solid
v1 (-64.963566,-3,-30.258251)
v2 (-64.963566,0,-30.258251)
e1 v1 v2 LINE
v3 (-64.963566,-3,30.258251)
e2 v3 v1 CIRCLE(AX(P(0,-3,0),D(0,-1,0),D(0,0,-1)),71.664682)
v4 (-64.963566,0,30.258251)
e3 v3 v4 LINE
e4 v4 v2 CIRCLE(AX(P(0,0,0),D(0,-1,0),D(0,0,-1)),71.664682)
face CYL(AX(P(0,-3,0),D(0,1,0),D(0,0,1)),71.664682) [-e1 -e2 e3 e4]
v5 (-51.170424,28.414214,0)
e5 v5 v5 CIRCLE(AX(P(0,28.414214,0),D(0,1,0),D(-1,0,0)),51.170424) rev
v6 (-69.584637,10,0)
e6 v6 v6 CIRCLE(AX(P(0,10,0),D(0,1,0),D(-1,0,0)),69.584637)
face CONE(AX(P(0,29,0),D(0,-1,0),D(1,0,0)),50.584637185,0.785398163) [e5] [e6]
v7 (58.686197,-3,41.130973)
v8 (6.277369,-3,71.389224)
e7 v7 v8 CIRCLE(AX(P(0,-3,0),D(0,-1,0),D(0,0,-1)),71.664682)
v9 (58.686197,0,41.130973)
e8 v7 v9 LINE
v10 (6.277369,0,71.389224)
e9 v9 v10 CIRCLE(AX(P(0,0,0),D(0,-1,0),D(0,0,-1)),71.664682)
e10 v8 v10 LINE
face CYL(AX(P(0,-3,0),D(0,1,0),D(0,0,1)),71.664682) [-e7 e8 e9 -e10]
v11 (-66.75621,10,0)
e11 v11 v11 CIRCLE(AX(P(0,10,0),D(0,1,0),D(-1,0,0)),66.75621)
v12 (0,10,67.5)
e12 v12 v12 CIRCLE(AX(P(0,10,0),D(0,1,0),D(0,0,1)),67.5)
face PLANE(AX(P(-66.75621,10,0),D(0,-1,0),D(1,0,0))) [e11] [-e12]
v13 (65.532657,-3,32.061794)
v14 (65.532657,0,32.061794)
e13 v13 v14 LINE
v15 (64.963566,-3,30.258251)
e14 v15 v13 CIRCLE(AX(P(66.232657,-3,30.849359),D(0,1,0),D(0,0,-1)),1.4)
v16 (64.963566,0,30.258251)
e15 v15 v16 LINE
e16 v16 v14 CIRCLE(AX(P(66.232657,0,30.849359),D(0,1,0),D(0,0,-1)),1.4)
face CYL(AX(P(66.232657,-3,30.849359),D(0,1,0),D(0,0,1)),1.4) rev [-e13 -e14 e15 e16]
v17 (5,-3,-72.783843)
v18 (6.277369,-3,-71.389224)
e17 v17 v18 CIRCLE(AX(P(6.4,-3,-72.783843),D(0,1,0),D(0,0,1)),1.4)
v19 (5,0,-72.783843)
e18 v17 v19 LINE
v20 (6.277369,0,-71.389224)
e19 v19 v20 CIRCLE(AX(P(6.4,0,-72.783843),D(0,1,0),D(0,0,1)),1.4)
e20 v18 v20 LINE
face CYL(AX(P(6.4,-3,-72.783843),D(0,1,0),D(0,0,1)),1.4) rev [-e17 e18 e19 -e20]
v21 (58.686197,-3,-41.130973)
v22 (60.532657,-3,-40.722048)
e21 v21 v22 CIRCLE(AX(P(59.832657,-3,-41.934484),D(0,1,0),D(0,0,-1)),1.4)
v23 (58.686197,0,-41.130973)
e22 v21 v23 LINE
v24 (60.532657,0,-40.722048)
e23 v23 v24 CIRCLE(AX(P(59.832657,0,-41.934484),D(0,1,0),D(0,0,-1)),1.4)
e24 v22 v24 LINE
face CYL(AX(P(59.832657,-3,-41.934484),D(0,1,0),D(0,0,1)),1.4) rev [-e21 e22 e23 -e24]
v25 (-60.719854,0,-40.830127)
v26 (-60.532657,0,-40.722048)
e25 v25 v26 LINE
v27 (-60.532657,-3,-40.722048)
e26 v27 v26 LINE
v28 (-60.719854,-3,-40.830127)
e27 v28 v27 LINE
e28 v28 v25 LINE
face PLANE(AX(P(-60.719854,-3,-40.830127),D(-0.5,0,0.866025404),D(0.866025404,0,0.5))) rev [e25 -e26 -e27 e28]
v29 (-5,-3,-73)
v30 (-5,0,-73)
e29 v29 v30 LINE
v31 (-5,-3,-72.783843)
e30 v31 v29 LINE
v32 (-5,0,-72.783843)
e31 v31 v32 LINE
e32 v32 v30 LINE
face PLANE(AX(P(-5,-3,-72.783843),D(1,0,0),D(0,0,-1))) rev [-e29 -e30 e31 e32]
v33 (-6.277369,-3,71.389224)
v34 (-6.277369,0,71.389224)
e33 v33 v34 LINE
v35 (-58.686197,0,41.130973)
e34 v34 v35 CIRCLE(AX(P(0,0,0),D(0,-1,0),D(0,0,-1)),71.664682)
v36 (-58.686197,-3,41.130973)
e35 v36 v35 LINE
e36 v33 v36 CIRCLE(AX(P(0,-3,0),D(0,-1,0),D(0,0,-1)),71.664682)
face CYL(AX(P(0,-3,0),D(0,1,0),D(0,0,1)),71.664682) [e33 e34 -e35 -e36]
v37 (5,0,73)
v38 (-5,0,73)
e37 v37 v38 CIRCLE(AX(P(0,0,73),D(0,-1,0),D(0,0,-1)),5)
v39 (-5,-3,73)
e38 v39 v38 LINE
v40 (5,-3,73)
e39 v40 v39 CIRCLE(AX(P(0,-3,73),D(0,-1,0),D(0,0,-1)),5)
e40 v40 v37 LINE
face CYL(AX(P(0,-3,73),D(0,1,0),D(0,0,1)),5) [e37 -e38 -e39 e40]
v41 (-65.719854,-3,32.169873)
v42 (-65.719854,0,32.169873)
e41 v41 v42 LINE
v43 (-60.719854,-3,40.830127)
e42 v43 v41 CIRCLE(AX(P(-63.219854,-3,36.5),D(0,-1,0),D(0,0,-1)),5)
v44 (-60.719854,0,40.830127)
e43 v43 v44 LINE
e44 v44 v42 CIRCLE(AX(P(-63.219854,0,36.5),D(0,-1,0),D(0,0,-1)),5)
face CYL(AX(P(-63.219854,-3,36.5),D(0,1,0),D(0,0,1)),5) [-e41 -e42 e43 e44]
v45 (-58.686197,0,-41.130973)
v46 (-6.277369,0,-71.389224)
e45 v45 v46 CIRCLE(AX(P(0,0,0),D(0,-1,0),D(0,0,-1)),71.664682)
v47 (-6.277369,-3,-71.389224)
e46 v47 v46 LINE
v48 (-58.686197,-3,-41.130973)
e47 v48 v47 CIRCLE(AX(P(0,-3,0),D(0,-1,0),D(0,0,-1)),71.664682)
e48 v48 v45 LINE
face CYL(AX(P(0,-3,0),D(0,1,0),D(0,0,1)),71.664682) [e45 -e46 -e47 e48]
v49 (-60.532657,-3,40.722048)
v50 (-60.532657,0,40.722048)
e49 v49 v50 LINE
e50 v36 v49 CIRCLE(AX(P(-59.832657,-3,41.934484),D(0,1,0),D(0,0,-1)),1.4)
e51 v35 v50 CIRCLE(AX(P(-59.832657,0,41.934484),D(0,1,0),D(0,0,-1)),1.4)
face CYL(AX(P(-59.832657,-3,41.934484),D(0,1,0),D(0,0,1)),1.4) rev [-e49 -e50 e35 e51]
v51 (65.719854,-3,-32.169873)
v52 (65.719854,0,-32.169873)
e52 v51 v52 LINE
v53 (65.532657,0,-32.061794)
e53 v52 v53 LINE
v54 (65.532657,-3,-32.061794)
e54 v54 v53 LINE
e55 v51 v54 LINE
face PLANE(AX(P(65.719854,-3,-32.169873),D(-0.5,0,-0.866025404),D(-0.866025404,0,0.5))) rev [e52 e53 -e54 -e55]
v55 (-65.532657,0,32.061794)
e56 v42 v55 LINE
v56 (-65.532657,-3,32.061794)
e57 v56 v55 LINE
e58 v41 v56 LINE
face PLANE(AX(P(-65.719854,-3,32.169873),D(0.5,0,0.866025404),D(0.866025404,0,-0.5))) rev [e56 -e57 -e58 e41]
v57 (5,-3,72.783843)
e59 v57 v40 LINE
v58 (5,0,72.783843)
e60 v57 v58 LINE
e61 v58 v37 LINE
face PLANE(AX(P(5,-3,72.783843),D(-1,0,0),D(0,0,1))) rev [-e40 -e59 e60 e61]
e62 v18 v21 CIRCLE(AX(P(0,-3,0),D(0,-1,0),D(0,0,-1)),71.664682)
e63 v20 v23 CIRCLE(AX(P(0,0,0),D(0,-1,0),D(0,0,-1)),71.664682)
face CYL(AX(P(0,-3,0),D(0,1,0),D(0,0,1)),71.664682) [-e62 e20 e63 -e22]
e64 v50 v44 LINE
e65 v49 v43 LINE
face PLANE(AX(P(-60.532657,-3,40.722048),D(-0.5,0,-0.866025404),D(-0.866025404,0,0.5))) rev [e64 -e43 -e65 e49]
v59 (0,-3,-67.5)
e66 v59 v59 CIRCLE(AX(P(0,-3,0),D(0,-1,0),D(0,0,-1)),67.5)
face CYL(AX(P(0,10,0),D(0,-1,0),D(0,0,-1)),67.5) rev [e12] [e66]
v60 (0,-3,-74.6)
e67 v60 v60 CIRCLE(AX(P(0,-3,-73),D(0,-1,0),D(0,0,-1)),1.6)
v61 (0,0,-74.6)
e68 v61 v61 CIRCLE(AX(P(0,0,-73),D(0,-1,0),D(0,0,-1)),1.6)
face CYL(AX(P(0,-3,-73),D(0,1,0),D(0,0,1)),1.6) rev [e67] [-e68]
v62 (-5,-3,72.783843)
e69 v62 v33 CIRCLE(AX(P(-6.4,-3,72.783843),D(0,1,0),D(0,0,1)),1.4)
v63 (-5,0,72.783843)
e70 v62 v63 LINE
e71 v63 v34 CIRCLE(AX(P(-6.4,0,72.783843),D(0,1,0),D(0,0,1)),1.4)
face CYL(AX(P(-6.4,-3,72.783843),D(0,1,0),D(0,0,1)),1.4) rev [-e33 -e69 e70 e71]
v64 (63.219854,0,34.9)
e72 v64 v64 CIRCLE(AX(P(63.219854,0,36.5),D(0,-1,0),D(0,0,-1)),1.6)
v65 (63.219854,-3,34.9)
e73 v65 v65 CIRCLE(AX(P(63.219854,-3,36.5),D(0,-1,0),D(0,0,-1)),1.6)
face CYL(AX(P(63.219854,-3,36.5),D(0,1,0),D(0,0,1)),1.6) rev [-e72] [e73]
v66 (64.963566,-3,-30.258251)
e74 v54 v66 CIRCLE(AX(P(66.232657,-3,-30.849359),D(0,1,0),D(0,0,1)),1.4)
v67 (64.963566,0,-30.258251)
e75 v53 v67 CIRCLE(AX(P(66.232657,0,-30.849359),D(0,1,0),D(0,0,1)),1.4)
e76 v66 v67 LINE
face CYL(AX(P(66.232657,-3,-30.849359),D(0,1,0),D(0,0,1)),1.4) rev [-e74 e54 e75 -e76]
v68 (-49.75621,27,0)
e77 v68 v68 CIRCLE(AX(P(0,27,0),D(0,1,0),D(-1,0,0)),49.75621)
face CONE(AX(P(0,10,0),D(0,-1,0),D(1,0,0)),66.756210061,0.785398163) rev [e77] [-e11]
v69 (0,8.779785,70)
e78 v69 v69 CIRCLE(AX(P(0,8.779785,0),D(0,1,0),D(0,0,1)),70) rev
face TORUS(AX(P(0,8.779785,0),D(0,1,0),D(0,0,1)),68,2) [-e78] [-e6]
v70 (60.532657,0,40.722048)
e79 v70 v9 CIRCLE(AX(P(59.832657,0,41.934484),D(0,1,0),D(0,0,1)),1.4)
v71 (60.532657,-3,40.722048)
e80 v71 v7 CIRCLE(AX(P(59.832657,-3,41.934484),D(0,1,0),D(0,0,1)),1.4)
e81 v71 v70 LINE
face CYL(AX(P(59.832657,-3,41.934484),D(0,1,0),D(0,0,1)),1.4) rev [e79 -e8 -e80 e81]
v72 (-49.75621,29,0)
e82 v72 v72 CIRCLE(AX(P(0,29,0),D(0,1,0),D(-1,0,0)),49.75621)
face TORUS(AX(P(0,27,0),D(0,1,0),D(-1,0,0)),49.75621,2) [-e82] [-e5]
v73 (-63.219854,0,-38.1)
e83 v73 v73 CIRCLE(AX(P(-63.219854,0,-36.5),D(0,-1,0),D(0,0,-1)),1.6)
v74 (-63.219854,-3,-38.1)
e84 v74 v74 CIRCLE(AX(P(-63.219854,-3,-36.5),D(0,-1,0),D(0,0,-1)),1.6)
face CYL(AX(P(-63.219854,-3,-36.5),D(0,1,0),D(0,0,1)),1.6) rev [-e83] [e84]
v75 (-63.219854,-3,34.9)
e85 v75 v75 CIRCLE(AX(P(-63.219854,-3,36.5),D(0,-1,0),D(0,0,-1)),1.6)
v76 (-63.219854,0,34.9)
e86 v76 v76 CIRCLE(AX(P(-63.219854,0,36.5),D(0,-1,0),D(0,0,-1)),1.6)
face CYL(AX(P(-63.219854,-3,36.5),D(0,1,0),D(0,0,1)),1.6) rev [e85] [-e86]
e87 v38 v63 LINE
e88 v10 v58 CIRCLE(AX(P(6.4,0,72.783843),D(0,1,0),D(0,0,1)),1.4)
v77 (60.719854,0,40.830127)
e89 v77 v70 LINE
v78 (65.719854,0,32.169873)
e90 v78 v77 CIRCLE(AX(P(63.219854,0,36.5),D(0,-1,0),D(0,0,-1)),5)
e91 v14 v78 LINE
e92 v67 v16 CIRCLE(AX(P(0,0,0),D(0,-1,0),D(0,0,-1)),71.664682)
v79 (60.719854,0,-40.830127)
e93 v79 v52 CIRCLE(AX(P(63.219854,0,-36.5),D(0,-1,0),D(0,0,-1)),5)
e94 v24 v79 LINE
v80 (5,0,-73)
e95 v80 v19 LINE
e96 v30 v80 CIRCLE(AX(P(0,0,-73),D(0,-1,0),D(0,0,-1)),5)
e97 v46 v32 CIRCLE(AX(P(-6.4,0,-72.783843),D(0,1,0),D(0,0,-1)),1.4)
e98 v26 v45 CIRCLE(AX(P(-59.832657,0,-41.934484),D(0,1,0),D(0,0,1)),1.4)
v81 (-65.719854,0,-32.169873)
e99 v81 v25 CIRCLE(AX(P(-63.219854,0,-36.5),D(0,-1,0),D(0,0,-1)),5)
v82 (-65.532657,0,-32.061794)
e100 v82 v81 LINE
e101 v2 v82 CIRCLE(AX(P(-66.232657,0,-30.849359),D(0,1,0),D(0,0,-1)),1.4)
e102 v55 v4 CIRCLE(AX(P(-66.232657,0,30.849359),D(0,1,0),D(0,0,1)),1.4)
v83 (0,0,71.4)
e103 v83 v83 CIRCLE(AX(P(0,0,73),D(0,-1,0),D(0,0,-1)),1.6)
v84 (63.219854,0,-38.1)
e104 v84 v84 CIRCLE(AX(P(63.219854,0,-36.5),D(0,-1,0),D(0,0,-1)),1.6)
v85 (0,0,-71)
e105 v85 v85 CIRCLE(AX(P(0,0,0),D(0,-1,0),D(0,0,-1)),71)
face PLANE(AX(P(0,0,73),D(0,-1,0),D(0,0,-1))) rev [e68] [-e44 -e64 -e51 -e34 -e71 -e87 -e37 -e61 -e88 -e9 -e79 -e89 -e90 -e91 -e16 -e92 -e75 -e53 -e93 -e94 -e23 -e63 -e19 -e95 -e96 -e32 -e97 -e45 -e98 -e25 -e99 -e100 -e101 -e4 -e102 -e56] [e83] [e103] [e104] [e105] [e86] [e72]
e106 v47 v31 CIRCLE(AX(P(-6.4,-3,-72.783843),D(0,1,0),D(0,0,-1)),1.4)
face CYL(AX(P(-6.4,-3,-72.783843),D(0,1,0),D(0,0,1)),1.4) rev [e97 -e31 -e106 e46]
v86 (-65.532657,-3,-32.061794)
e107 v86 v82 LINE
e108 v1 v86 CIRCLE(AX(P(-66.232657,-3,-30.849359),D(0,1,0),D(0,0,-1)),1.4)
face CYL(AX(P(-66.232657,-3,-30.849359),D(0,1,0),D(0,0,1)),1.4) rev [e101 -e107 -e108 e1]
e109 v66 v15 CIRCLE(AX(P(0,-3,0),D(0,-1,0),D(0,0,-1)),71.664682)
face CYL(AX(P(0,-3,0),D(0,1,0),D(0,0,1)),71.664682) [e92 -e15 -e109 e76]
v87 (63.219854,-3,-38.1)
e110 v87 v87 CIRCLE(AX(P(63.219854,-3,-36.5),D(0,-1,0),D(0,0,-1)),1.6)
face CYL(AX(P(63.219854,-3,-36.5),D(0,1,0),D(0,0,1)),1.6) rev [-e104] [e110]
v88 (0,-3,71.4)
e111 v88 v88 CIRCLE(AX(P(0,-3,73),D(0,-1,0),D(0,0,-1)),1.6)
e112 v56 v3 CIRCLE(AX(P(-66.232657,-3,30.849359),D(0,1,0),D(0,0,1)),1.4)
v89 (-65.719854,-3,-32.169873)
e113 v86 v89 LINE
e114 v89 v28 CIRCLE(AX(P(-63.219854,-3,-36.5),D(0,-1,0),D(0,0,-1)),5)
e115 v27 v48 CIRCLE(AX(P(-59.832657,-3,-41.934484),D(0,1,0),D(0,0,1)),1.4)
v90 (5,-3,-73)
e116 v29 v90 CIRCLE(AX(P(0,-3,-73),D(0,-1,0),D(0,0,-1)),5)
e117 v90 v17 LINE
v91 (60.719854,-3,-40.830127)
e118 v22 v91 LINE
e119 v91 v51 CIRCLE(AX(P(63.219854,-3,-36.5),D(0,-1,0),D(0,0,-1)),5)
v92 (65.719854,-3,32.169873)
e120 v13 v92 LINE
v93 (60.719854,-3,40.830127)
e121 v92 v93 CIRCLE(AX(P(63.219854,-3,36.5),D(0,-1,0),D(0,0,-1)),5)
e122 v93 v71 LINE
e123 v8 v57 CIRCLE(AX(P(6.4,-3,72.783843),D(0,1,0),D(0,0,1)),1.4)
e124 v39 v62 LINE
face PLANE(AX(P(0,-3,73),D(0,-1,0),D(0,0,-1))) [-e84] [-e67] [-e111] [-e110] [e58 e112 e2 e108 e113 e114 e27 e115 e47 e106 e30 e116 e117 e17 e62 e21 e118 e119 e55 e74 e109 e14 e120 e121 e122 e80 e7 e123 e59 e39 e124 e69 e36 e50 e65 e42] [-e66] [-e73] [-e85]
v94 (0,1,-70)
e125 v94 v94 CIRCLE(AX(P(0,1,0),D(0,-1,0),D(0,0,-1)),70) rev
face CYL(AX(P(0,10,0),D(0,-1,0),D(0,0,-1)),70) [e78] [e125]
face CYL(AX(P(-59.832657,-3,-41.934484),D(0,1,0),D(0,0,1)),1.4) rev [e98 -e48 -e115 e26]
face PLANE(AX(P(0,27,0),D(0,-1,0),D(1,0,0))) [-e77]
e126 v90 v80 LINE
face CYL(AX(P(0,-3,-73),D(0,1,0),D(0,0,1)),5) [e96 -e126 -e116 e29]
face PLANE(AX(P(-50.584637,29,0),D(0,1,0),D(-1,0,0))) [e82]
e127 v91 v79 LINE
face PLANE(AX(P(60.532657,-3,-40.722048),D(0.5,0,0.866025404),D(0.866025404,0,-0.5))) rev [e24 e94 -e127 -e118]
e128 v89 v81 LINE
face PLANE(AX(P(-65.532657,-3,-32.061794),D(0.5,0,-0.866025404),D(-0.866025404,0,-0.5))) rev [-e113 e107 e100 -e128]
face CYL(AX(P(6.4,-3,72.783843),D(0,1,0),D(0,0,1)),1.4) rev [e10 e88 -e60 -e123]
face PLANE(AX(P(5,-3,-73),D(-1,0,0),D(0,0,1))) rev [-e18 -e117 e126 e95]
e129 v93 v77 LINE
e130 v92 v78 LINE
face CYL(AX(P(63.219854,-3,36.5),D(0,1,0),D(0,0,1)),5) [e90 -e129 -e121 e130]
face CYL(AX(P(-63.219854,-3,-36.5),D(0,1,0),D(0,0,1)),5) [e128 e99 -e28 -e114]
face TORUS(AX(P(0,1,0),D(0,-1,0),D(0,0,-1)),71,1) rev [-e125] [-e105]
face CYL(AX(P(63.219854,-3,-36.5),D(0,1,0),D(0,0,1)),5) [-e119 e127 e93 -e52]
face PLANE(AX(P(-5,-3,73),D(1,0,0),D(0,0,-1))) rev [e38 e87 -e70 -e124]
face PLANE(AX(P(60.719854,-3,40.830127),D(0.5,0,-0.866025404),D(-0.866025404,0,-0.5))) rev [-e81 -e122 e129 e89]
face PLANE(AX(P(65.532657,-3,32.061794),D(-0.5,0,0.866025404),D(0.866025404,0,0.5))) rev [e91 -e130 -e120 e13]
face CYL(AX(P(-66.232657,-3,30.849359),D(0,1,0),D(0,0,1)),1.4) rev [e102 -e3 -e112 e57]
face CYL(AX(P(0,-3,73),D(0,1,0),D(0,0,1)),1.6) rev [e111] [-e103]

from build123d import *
from build123d.topology import SkipClean

# Parameters (mm, degrees)
SKETCH_1_R      = 70
SKETCH_1_R_2    = 67.5
EXTRUDE_1_DEPTH = 10
EXTRUDE_START   = 3
SKETCH_2_R      = 67.5
SKETCH_2_R_2    = 1.6
EXTRUDE_2_DEPTH = 3
FILLET_1_R      = 1
FILLET_2_R      = 2


with BuildPart() as part:
    # Эскиз1 → Бобышка-Вытянуть1 (new body)
    with BuildSketch(Plane(origin=(0, 0, 0), x_dir=(1, 0, 0), z_dir=(0, 1, 0))):
        with Locations(Location((0, 0, 0), (0, 0, 270))):
            Circle(SKETCH_1_R)
        with Locations(Location((0, 0, 0), (0, 0, 270))):
            Circle(SKETCH_1_R_2, mode=Mode.SUBTRACT)
    extrude(amount=EXTRUDE_1_DEPTH)

    # Эскиз2 → Бобышка-Вытянуть2 (add)
    with SkipClean():  # the faces are left unmerged after this step: merging them gives an invalid solid
        with BuildSketch(Plane.XZ.offset(EXTRUDE_START)):
            with BuildLine():
                Line((-5, 73), (-5, 72.783842909))
                ThreePointArc((-5, 72.783842909), (-5.367603881, 71.838243495), (-6.277368932, 71.389224101))
                ThreePointArc((-6.277368932, 71.389224101), (-35.832341113, 62.063435361), (-58.686197162, 41.130973015))
                ThreePointArc((-58.686197162, 41.130973015), (-59.52994189, 40.567603065), (-60.532656944, 40.722048474))
                Line((-60.532656944, 40.722048474), (-60.719854476, 40.830127019))
                ThreePointArc((-60.719854476, 40.830127019), (-67.549981495, 39), (-65.719854476, 32.169872981))
                Line((-65.719854476, 32.169872981), (-65.532656944, 32.061794436))
                ThreePointArc((-65.532656944, 32.061794436), (-64.89754577, 31.270640429), (-64.963566094, 30.258251086))
                ThreePointArc((-64.963566094, 30.258251086), (-71.664682225, 0), (-64.963566094, -30.258251086))
                ThreePointArc((-64.963566094, -30.258251086), (-64.89754577, -31.270640429), (-65.532656944, -32.061794436))
                Line((-65.532656944, -32.061794436), (-65.719854476, -32.169872981))
                ThreePointArc((-65.719854476, -32.169872981), (-67.549981495, -39), (-60.719854476, -40.830127019))
                Line((-60.719854476, -40.830127019), (-60.532656944, -40.722048474))
                ThreePointArc((-60.532656944, -40.722048474), (-59.52994189, -40.567603065), (-58.686197162, -41.130973015))
                ThreePointArc((-58.686197162, -41.130973015), (-35.832341113, -62.063435361), (-6.277368932, -71.389224101))
                ThreePointArc((-6.277368932, -71.389224101), (-5.367603881, -71.838243495), (-5, -72.783842909))
                Line((-5, -72.783842909), (-5, -73))
                ThreePointArc((-5, -73), (0, -78), (5, -73))
                Line((5, -73), (5, -72.783842909))
                ThreePointArc((5, -72.783842909), (5.367603881, -71.838243495), (6.277368932, -71.389224101))
                ThreePointArc((6.277368932, -71.389224101), (35.832341113, -62.063435361), (58.686197162, -41.130973015))
                ThreePointArc((58.686197162, -41.130973015), (59.52994189, -40.567603065), (60.532656944, -40.722048474))
                Line((60.532656944, -40.722048474), (60.719854476, -40.830127019))
                ThreePointArc((60.719854476, -40.830127019), (67.549981495, -39), (65.719854476, -32.169872981))
                Line((65.719854476, -32.169872981), (65.532656944, -32.061794436))
                ThreePointArc((65.532656944, -32.061794436), (64.89754577, -31.270640429), (64.963566094, -30.258251086))
                ThreePointArc((64.963566094, -30.258251086), (71.664682225, 0), (64.963566094, 30.258251086))
                ThreePointArc((64.963566094, 30.258251086), (64.89754577, 31.270640429), (65.532656944, 32.061794436))
                Line((65.532656944, 32.061794436), (65.719854476, 32.169872981))
                ThreePointArc((65.719854476, 32.169872981), (67.549981495, 39), (60.719854476, 40.830127019))
                Line((60.719854476, 40.830127019), (60.532656944, 40.722048474))
                ThreePointArc((60.532656944, 40.722048474), (59.52994189, 40.567603065), (58.686197162, 41.130973015))
                ThreePointArc((58.686197162, 41.130973015), (35.832341113, 62.063435361), (6.277368932, 71.389224101))
                ThreePointArc((6.277368932, 71.389224101), (5.367603881, 71.838243495), (5, 72.783842909))
                Line((5, 72.783842909), (5, 73))
                ThreePointArc((5, 73), (0, 78), (-5, 73))
            make_face()
            with Locations(Location((0, 0, 0), (0, 0, 270))):
                Circle(SKETCH_2_R, mode=Mode.SUBTRACT)
            with Locations(Location((0, 73, 0), (0, 0, 270))):
                Circle(SKETCH_2_R_2, mode=Mode.SUBTRACT)
            with Locations(Location((63.219854476, 36.5, 0), (0, 0, 270))):
                Circle(SKETCH_2_R_2, mode=Mode.SUBTRACT)
            with Locations(Location((63.219854476, -36.5, 0), (0, 0, 270))):
                Circle(SKETCH_2_R_2, mode=Mode.SUBTRACT)
            with Locations(Location((0, -73, 0), (0, 0, 270))):
                Circle(SKETCH_2_R_2, mode=Mode.SUBTRACT)
            with Locations(Location((-63.219854476, -36.5, 0), (0, 0, 270))):
                Circle(SKETCH_2_R_2, mode=Mode.SUBTRACT)
            with Locations(Location((-63.219854476, 36.5, 0), (0, 0, 270))):
                Circle(SKETCH_2_R_2, mode=Mode.SUBTRACT)
        extrude(amount=-EXTRUDE_2_DEPTH)

    # Скругление1
    fillet_1_edges = [part.edges().sort_by_distance(p)[0] for p in [
        (0, 0, -70),
    ]]
    fillet(fillet_1_edges, radius=FILLET_1_R)

    # Эскиз3 → Повернуть1 (revolve)
    with BuildSketch(Plane.XY, mode=Mode.PRIVATE) as revolve_1_sk:
        Polygon((-69.584637185, 10), (-50.584637185, 29), (0, 29), (0, 27), (-49.756210061, 27), (-66.756210061, 10), align=None)
    revolve(revolve_1_sk.sketch.rotate(Axis((0, 27, 0), (0, -1, 0)), 90), axis=Axis((0, 27, 0), (0, -1, 0)))

    # Скругление2
    # the kernel refuses this fillet: 2 mm, written as the material it takes off along each edge
    with BuildSketch(Plane(origin=(0, 29, 0), x_dir=(0, 0, -1), z_dir=(-1, 0, 0))) as fillet_2_piece_1:
        with BuildLine():
            CenterArc((50.584637185 - FILLET_2_R * 0.414213562373, FILLET_2_R), FILLET_2_R, 270, 45)
            Line((50.584637185 - FILLET_2_R * 0.414213562373, 0), (50.584637185 - FILLET_2_R * 0.414213562373, -FILLET_2_R * 0.02))
            Line((50.584637185 - FILLET_2_R * 0.414213562373, -FILLET_2_R * 0.02), (50.584637185 + FILLET_2_R * 0.00828427124746, -FILLET_2_R * 0.02))
            Line((50.584637185 + FILLET_2_R * 0.00828427124746, -FILLET_2_R * 0.02), (50.584637185 + FILLET_2_R * 0.307035354437, FILLET_2_R * 0.27875108319))
            Line((50.584637185 + FILLET_2_R * 0.307035354437, FILLET_2_R * 0.27875108319), (50.584637185 + FILLET_2_R * 0.292893218813, FILLET_2_R * 0.292893218813))
        make_face()
    revolve(axis=Axis((0, 29, 0), (0, -1, 0)), mode=Mode.SUBTRACT)
    with BuildSketch(Plane(origin=(0, 10, 0), x_dir=(0, 0, 1), z_dir=(-1, 0, 0))) as fillet_2_piece_2:
        with BuildLine():
            CenterArc((68, -1.220215141), FILLET_2_R, 0, 37.597281425)
            Line((69.584637185, 0), (69.616329929, 0.024404303))
            ThreePointArc((69.616329929, 0.024404303), (69.792318593, 0.04), (70, 0.04))
            Line((70, 0.04), (70.04, 0))
            Line((70.04, 0), (70.04, -1.220215141))
            Line((70.04, -1.220215141), (70, -1.220215141))
        make_face()
    revolve(axis=Axis((0, 10, 0), (0, 1, 0)), mode=Mode.SUBTRACT)


solid = part.part
